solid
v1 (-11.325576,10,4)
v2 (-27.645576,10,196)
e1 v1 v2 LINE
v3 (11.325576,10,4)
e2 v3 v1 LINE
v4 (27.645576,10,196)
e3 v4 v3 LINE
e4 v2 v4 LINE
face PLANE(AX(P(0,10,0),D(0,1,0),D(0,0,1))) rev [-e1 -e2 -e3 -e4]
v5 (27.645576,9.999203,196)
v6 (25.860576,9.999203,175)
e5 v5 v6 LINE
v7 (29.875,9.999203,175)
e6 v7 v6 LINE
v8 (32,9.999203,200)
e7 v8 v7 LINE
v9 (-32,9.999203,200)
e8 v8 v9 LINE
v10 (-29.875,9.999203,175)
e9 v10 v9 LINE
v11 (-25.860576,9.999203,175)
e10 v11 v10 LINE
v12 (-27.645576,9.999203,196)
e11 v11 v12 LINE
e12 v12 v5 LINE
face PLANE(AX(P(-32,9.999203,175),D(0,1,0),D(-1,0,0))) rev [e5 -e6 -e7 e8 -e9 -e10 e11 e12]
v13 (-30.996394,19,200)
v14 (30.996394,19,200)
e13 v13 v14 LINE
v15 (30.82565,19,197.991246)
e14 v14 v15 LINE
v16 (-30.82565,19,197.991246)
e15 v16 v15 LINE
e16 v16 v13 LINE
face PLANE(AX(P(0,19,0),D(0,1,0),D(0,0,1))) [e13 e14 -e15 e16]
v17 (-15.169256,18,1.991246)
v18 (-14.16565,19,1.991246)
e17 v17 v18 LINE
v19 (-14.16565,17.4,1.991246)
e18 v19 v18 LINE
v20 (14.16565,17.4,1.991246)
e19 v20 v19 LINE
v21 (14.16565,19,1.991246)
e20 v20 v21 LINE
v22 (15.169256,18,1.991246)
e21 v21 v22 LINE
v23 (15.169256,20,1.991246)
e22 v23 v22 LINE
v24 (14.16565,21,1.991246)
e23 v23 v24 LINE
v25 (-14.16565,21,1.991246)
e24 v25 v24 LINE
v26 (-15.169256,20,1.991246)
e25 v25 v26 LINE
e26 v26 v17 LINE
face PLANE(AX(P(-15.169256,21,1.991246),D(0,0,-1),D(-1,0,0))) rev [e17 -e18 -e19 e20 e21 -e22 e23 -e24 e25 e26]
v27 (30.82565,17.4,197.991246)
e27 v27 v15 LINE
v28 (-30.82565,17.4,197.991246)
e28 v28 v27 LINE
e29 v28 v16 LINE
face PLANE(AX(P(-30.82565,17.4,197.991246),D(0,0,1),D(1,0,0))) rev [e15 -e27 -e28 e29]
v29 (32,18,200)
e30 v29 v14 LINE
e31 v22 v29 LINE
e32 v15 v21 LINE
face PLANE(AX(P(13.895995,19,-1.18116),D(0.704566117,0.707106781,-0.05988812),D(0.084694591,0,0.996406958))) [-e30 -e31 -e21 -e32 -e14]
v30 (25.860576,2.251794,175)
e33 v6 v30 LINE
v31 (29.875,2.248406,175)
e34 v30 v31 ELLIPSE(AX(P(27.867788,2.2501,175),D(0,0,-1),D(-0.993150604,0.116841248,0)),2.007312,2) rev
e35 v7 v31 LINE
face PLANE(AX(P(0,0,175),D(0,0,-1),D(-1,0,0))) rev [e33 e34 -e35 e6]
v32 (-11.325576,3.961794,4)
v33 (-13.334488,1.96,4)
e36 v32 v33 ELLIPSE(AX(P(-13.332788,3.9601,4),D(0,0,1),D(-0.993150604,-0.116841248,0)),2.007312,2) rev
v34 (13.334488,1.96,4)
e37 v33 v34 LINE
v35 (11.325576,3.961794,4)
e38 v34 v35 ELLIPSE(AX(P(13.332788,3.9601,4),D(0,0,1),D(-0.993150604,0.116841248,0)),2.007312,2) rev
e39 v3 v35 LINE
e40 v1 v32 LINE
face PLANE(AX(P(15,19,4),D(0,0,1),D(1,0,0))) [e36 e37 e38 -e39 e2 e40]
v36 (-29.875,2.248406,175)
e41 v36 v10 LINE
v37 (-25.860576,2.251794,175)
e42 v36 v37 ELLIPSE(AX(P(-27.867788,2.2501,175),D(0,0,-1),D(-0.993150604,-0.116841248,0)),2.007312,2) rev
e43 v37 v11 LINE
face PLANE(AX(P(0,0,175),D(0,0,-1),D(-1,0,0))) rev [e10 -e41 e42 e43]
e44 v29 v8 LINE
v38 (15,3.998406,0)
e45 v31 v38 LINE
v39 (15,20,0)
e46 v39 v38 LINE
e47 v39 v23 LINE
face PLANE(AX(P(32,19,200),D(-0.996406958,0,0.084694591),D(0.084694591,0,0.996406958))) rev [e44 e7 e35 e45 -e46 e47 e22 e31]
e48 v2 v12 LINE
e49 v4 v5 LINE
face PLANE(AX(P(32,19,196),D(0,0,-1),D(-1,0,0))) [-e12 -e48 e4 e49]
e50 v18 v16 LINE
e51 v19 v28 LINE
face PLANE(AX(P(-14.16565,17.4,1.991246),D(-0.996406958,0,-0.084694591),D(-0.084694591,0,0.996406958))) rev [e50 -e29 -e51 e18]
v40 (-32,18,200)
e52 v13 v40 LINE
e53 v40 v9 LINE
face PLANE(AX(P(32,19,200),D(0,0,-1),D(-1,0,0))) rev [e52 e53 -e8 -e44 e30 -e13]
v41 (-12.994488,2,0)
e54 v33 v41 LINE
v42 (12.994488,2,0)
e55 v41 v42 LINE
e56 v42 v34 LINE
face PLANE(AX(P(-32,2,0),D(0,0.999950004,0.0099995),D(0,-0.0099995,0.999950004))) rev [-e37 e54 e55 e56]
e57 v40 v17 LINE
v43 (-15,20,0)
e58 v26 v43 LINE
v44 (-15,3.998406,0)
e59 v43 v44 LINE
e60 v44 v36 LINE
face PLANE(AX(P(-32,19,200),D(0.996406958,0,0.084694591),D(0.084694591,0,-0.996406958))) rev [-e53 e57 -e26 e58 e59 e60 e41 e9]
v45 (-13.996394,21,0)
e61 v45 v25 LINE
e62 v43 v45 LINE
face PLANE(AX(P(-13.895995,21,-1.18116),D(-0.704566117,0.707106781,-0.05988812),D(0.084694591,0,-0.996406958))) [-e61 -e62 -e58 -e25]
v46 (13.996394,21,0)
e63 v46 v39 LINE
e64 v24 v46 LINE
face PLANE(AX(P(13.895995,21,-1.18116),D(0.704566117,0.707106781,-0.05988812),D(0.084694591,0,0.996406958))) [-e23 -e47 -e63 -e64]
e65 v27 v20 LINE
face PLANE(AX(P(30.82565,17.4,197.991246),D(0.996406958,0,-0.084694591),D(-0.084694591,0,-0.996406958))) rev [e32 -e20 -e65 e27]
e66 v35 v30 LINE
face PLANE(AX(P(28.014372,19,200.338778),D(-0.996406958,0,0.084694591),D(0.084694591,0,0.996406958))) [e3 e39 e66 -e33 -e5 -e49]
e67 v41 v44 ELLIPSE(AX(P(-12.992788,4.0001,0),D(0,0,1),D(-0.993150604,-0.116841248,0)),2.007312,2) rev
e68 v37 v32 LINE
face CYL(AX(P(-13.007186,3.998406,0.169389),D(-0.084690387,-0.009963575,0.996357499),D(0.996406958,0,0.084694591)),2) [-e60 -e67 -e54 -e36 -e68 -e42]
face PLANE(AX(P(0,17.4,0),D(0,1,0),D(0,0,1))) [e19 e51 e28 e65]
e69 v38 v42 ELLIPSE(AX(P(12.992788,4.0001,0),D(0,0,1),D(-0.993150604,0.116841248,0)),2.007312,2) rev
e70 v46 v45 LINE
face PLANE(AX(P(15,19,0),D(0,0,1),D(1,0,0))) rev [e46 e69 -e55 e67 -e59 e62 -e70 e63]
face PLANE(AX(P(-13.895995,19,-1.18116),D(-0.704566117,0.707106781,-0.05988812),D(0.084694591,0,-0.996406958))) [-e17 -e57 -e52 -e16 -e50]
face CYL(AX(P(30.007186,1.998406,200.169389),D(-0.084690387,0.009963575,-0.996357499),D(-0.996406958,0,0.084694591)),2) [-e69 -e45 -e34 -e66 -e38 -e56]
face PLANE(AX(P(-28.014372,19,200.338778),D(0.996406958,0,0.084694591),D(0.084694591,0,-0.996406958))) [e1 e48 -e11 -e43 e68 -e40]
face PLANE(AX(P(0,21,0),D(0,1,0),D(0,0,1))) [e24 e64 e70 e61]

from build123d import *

# Parameters (mm, degrees)
BOSS_EXTRUDE1_DEPTH      = 19
CUT_EXTRUDE1_DEPTH       = 204.4330356653019
CUT_EXTRUDE1_DEPTH_BACK  = 204.4330356653019
SHELL1_T                 = -4
SHELL1_THICKNESS_2_DEPTH = 5
FILLET2_R                = 2
FILLET3_R                = 2
BOSS_EXTRUDE2_DEPTH      = 1.9999999999999862
CHAMFER1_SIZE            = 1
CHAMFER2_SIZE            = 1
CUT_EXTRUDE2_DEPTH       = 1.6
CUT_EXTRUDE3_DEPTH       = 25.000000000000007


with BuildPart() as part:
    # Sketch1 → Boss-Extrude1 (new body)
    with BuildSketch(Plane(origin=(0, 0, 0), x_dir=(1, 0, 0), z_dir=(0, 1, 0))):
        Polygon((15, 1.84e-15), (-15, -1.84e-15), (-31.99999999999997, -200), (32.00000000000003, -200), align=None)
    extrude(amount=BOSS_EXTRUDE1_DEPTH)

    # Sketch4 → Cut-Extrude1 (cut, two sides: drawn at the far end of the back side and taken through both)
    with BuildSketch(Plane(origin=(0, 0, 0), x_dir=(0, 0, -1), z_dir=(1, 0, 0)).offset(-CUT_EXTRUDE1_DEPTH_BACK)):
        Polygon((-200, 0), (0, 0), (1.59e-15, 2), align=None)
    extrude(amount=CUT_EXTRUDE1_DEPTH + CUT_EXTRUDE1_DEPTH_BACK, mode=Mode.SUBTRACT)

    # Shell1
    shell1_openings = [part.faces().sort_by_distance(p)[0] for p in [
        (0, 0.879432624, 112.056737589),
    ]]
    offset(amount=SHELL1_T, openings=shell1_openings, kind=Kind.INTERSECTION)

    # Shell1 thickness 2 face (on inner face of the shell) → Shell1 thickness 2 (add)
    with BuildSketch(Plane(origin=(0, 15, 113.400681607), x_dir=(0, 0, 1), z_dir=(0, 1, 0))):
        Polygon((-109.400681607, 11.325576006448747), (82.599318393, 27.645576006448778), (82.599318393, -27.645576006448714), (-109.400681607, -11.325576006448745), align=None)
    extrude(amount=-SHELL1_THICKNESS_2_DEPTH)

    # Fillet2
    fillet2_edges = [part.edges().sort_by_distance(p)[0] for p in [
        (23.500000000000014, 0.9999999999999999, 100.00000000000001),
        (19.485576006448763, 1.0000000000000002, 100),
    ]]
    fillet(fillet2_edges, radius=FILLET2_R - 0.0001)  # a hair under: the kernel refuses the full size

    # Fillet3
    fillet3_edges = [part.edges().sort_by_distance(p)[0] for p in [
        (-23.499999999999986, 1, 100),
        (-19.48557600644873, 0.9999999999999998, 100),
    ]]
    fillet(fillet3_edges, radius=FILLET3_R - 0.0001)  # a hair under: the kernel refuses the full size

    # Sketch5 → Boss-Extrude2 (add)
    with BuildSketch(Plane(origin=(0, 19, 0), x_dir=(1, 0, 0), z_dir=(0, 1, 0))):
        Polygon((-15, -1.84e-15), (-15.169255888521393, -1.9912457473105094), (15.169255888521398, -1.9912457473105094), (15, 1.84e-15), align=None)
    extrude(amount=BOSS_EXTRUDE2_DEPTH)

    # Chamfer1
    chamfer1_edges = [part.edges().sort_by_distance(p)[0] for p in [
        (23.58462794426071, 19, 100.99562287365525),
        (-23.58462794426068, 19, 100.99562287365526),
    ]]
    chamfer(chamfer1_edges, length=CHAMFER1_SIZE)

    # Chamfer2
    chamfer2_edges = [part.edges().sort_by_distance(p)[0] for p in [
        (-15.084627944260696, 20.999999999999986, 0.9956228736552557),
        (15.0846279442607, 20.999999999999986, 0.9956228736552538),
    ]]
    chamfer(chamfer2_edges, length=CHAMFER2_SIZE)

    # Sketch6 → Cut-Extrude2 (cut)
    with BuildSketch(Plane(origin=(0, 19, 0), x_dir=(1, 0, 0), z_dir=(0, 1, 0))):
        Polygon((-14.165649890133558, -1.9912457473105094), (14.16564989013358, -1.9912457473105079), (30.825649890133608, -197.99124574731053), (-30.825649890133526, -197.99124574731053), align=None)
    extrude(amount=-CUT_EXTRUDE2_DEPTH, mode=Mode.SUBTRACT)

    # Sketch7 → Cut-Extrude3 (cut)
    with BuildSketch(Plane.XY.offset(200)):
        Polygon((-31.99999999999997, 9.99920305283565), (32.00000000000003, 9.999203052835664), (32.00000000000003, 0), (-31.99999999999997, 0), align=None)
    extrude(amount=-CUT_EXTRUDE3_DEPTH, mode=Mode.SUBTRACT)


solid = part.part
